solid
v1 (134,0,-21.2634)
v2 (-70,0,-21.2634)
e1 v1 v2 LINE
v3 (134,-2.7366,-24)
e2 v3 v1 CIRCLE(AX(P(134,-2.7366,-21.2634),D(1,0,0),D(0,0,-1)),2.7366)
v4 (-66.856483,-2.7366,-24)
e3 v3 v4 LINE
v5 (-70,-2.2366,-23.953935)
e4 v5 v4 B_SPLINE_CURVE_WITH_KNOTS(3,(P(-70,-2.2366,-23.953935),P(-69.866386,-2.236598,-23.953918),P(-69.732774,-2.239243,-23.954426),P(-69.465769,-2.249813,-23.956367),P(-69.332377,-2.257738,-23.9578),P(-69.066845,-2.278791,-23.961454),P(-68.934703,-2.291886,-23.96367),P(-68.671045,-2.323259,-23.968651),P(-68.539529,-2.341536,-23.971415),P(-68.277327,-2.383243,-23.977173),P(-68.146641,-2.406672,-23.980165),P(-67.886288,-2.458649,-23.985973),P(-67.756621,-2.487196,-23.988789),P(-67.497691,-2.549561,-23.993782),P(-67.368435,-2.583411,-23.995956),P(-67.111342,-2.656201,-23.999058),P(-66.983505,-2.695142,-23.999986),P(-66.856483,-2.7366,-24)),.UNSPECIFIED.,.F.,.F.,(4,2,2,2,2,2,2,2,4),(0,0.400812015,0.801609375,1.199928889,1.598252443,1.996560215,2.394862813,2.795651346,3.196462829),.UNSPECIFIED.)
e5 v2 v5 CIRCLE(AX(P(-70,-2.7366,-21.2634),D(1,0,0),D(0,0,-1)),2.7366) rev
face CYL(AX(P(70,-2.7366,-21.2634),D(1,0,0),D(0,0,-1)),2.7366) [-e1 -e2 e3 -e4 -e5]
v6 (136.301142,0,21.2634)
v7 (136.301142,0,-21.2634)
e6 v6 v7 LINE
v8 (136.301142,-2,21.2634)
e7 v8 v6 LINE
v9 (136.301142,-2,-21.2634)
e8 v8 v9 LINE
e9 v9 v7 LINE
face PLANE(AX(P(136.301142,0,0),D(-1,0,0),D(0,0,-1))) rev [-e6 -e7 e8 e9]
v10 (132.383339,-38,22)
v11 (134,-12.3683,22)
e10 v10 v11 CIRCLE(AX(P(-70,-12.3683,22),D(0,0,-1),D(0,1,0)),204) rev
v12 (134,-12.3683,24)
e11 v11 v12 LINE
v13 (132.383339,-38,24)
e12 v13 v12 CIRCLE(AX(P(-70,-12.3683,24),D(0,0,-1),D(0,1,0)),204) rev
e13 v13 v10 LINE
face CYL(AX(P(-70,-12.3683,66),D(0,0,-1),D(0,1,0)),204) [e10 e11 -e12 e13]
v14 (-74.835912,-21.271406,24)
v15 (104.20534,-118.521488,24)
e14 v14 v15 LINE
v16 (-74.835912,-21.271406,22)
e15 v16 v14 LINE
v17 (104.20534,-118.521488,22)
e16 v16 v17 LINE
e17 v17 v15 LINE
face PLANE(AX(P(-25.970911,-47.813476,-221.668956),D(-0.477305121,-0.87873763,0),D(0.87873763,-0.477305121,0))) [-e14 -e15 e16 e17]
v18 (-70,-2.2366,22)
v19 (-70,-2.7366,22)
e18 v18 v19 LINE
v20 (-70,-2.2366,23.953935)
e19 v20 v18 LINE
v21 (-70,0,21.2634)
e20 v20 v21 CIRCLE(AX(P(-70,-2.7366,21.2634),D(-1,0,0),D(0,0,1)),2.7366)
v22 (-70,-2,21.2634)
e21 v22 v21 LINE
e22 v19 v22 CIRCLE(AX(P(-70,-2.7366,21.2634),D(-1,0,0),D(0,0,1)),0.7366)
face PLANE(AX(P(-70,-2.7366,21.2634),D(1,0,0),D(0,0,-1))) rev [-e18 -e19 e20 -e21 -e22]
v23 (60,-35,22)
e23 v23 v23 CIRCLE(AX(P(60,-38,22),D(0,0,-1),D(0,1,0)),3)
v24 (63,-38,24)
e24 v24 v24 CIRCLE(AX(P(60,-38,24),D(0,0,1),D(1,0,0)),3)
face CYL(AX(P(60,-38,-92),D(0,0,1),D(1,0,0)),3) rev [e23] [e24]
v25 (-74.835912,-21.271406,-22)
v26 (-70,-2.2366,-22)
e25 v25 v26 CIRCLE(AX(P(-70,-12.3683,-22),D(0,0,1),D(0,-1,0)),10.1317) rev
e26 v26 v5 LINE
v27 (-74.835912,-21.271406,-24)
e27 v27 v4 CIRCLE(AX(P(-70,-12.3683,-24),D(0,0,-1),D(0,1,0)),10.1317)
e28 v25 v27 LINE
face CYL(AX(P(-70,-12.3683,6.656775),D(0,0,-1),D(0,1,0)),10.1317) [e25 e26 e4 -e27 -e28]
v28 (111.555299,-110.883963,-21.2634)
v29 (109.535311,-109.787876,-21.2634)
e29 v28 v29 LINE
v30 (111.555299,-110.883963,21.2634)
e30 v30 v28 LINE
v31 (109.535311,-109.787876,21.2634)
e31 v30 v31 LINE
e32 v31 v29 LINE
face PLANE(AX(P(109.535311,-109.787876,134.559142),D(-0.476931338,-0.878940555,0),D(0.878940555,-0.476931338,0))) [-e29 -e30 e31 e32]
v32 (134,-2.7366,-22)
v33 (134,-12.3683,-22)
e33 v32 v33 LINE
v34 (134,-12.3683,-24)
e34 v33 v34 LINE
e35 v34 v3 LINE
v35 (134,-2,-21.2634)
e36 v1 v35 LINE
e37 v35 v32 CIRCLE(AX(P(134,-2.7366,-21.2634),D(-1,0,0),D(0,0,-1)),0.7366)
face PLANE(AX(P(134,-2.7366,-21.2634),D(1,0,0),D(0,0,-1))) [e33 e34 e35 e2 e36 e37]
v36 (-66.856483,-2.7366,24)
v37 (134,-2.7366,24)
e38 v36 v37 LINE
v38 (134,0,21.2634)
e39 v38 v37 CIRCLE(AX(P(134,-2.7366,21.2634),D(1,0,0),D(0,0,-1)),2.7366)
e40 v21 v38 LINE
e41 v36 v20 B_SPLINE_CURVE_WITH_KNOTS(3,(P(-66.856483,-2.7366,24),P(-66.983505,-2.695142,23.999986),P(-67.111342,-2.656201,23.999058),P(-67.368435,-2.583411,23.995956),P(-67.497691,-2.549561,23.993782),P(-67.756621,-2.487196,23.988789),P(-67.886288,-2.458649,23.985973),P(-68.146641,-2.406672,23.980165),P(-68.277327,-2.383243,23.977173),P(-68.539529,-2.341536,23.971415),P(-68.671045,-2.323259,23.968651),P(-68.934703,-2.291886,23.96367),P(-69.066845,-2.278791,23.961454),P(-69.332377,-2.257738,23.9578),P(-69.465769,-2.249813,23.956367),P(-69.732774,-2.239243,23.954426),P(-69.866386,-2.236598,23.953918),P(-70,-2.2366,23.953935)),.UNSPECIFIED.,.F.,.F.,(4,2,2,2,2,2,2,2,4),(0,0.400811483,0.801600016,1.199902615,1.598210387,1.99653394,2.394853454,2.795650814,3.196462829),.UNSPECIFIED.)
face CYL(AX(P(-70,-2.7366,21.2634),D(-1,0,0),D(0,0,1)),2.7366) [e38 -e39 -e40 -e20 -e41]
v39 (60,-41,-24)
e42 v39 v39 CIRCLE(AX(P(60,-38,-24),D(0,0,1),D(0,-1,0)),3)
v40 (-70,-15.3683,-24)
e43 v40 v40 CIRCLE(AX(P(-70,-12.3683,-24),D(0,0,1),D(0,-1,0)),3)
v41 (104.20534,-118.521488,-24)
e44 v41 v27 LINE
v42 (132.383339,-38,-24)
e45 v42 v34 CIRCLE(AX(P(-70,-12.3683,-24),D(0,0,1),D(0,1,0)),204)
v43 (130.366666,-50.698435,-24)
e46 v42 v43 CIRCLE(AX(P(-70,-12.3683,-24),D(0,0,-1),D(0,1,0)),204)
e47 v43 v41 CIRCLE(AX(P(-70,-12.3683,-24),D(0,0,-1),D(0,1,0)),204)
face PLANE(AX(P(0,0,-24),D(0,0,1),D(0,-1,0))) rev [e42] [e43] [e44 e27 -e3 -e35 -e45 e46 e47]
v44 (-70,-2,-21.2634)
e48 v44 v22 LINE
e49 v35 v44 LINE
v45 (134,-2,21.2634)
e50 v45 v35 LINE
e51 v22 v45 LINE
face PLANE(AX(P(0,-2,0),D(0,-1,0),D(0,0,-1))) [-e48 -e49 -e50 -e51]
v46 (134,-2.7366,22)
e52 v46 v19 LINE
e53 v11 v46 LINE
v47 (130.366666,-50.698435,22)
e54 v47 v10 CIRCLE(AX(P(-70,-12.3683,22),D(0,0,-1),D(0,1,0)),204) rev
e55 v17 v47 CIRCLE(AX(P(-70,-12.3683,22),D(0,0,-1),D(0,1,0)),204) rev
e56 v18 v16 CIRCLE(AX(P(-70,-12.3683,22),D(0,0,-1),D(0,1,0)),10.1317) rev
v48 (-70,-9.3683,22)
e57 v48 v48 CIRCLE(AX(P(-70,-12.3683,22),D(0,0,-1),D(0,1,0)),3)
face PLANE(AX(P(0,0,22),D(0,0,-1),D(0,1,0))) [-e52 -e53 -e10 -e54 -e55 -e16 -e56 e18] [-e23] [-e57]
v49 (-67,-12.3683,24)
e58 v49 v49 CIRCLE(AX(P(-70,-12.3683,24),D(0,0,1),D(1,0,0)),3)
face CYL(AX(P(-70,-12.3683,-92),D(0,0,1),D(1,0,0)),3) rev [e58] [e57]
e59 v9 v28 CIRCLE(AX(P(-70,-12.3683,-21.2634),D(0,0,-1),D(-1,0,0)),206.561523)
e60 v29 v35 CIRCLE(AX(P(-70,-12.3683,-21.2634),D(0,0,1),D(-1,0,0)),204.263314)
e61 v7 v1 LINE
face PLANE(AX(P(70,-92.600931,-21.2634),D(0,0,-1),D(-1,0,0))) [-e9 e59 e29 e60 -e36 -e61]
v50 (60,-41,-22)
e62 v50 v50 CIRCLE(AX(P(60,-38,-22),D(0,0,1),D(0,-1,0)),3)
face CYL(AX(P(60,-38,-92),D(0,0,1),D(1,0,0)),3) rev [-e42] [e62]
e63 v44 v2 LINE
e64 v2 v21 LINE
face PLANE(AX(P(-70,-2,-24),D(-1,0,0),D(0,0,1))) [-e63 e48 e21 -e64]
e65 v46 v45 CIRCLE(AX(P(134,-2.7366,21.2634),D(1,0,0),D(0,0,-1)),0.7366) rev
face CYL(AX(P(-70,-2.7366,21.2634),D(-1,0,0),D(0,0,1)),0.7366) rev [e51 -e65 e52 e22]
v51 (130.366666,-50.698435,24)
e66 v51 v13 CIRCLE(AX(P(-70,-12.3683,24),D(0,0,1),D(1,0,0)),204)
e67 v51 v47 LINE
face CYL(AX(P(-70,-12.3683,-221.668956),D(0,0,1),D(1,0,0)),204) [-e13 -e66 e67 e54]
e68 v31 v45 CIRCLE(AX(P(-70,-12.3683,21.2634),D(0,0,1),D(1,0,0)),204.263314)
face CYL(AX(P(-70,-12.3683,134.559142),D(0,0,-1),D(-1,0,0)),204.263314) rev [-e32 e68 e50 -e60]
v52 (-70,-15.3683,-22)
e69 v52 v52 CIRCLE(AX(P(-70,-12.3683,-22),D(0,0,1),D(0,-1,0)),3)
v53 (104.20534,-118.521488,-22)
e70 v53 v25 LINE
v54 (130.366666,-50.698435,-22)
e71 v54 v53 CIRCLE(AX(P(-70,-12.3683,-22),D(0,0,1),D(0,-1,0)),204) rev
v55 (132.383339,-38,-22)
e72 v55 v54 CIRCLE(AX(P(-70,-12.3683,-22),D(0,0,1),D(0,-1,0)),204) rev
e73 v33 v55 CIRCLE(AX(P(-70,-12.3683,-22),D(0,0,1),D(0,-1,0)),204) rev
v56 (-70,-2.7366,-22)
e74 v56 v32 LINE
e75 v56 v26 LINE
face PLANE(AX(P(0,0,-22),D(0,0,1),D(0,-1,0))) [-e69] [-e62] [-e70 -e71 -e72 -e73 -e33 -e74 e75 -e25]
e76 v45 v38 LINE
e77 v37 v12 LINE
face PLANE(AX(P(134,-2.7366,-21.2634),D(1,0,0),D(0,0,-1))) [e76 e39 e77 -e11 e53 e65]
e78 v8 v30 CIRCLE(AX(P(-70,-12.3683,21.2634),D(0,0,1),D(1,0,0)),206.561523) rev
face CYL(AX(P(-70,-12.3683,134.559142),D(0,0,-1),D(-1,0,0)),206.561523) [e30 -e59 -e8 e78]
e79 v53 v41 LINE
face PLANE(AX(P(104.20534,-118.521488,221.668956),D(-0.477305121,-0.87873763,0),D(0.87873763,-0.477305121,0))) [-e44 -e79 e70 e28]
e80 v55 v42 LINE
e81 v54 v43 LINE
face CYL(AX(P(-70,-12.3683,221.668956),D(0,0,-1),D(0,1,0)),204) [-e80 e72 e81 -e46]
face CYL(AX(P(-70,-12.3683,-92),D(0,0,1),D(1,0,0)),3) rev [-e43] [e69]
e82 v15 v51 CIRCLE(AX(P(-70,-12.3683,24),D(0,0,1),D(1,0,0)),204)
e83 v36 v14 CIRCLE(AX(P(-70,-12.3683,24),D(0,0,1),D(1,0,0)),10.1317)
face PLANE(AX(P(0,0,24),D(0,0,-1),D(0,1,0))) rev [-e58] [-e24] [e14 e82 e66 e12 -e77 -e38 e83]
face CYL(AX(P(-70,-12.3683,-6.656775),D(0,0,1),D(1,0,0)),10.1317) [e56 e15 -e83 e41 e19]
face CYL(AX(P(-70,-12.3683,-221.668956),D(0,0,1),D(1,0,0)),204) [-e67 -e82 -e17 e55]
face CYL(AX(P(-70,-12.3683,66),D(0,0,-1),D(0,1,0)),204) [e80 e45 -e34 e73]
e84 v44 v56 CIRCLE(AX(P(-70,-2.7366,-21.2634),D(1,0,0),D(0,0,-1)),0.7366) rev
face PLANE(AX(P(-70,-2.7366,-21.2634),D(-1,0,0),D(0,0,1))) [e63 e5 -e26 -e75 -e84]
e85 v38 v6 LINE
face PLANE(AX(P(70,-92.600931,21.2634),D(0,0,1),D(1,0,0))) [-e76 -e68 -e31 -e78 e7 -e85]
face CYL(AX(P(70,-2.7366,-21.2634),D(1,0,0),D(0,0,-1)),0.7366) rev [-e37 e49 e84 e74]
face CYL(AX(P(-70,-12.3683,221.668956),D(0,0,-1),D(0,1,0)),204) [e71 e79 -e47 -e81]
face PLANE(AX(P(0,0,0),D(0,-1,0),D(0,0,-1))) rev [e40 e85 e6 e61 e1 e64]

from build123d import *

# Parameters (mm, degrees)
BASE_FLANGE1_DEPTH           = 2
EDGE_FLANGE1_STRIP_CUT_DEPTH = 140
EDGE_FLANGE1_DEPTH           = 140
EDGE_FLANGE2_STRIP_CUT_DEPTH = 140
EDGE_FLANGE2_DEPTH           = 140
BOSS_EXTRUDE1_DEPTH          = 2
BOSS_EXTRUDE2_START          = -2
BOSS_EXTRUDE2_DEPTH          = 2
SKETCH14_R                   = 10.1317
BOSS_EXTRUDE3_DEPTH          = 2
BOSS_EXTRUDE4_START          = -2
SKETCH15_R                   = 10.131700000000007
BOSS_EXTRUDE4_DEPTH          = 2
FILLET1_R                    = 20
SKETCH16_R                   = 3.0000000000000084
SKETCH16_R_2                 = 3.000000000000008
CUT_EXTRUDE1_DEPTH           = 116.00000000000001
BOSS_EXTRUDE5_DEPTH          = 2
BOSS_EXTRUDE6_DEPTH          = 64
BOSS_EXTRUDE8_START          = 64
BOSS_EXTRUDE8_DEPTH          = 64
SKETCH38_R                   = 3.000000000000008
SKETCH38_R_2                 = 2.9999999999999947
BOSS_EXTRUDE9_DEPTH          = 2
BOSS_EXTRUDE10_START         = -2
SKETCH40_R                   = 3.0000000000000084
BOSS_EXTRUDE10_DEPTH         = 2
CUT_EXTRUDE2_START           = -90
CUT_EXTRUDE2_DEPTH           = 90
SKETCH42_W                   = 17.233890077557817
SKETCH42_H                   = 15.447994732733191
CUT_EXTRUDE3_DEPTH           = 90
BOSS_EXTRUDE11_DEPTH         = 42.5268


# Sheet-metal steps are written as plain solids
with BuildPart() as part:
    # Sketch1 → Base-Flange1 (new body)
    with BuildSketch(Plane(origin=(0, 0, 0), x_dir=(1, 0, 0), z_dir=(0, 1, 0))):
        Polygon((69.99999999999999, 24.000000000000007), (-70.00000000000003, 23.99999999999999), (-70.00000000000003, -24.000000000000018), (69.99999999999999, -24), align=None)
    extrude(amount=-BASE_FLANGE1_DEPTH)

    # Edge-Flange1 strip (across the edge) → Edge-Flange1 strip cut (cut)
    with BuildSketch(Plane(origin=(69.99999999999999, -2, 24), x_dir=(-1.2e-16, -3.49e-15, -1), z_dir=(-1, 0, 1.2e-16))):
        Polygon((-6.736600000000024, -2.0000000000000235), (2.73660000000001, -1.9999999999999907), (2.736600000000003, 9.55e-15), (-6.736600000000031, -2.353e-14), align=None)
    extrude(amount=EDGE_FLANGE1_STRIP_CUT_DEPTH, mode=Mode.SUBTRACT)

    # Edge-Flange1 section (across the edge) → Edge-Flange1 (add)
    with BuildSketch(Plane(origin=(69.99999999999999, -2, 24), x_dir=(-1.2e-16, -3.49e-15, -1), z_dir=(-1, 0, 1.2e-16))):
        with BuildLine():
            Line((0, 0.7366000000000096), (0, 20.000000000000004))
            Line((0, 20.000000000000004), (2, 20.000000000000004))
            Line((2, 20.000000000000004), (2, 0.7366000000000096))
            ThreePointArc((2, 0.7366000000000096), (2.21574514497799, 0.21574514497799768), (2.736600000000003, 9.55e-15))
            Line((2.736600000000003, 9.55e-15), (2.73660000000001, -1.9999999999999907))
            ThreePointArc((2.73660000000001, -1.9999999999999907), (0.8015315826048977, -1.1984684173951), (0, 0.7366000000000096))
        make_face()
    extrude(amount=EDGE_FLANGE1_DEPTH)

    # Edge-Flange2 strip (across the edge) → Edge-Flange2 strip cut (cut)
    with BuildSketch(Plane(origin=(-70.00000000000003, -2, -23.999999999999993), x_dir=(1.2e-16, -3.49e-15, 1), z_dir=(1, 0, -1.2e-16))):
        Polygon((-6.736600000000024, -2.0000000000000235), (2.73660000000001, -1.9999999999999907), (2.736600000000003, 9.55e-15), (-6.736600000000031, -2.353e-14), align=None)
    extrude(amount=EDGE_FLANGE2_STRIP_CUT_DEPTH, mode=Mode.SUBTRACT)

    # Edge-Flange2 section (across the edge) → Edge-Flange2 (add)
    with BuildSketch(Plane(origin=(-70.00000000000003, -2, -23.999999999999993), x_dir=(1.2e-16, -3.49e-15, 1), z_dir=(1, 0, -1.2e-16))):
        with BuildLine():
            Line((0, 0.7366000000000096), (0, 20.000000000000004))
            Line((0, 20.000000000000004), (2, 20.000000000000004))
            Line((2, 20.000000000000004), (2, 0.7366000000000096))
            ThreePointArc((2, 0.7366000000000096), (2.21574514497799, 0.21574514497799768), (2.736600000000003, 9.55e-15))
            Line((2.736600000000003, 9.55e-15), (2.73660000000001, -1.9999999999999907))
            ThreePointArc((2.73660000000001, -1.9999999999999907), (0.8015315826048977, -1.1984684173951), (0, 0.7366000000000096))
        make_face()
    extrude(amount=EDGE_FLANGE2_DEPTH)

    # Sketch12 → Boss-Extrude1 (add)
    with BuildSketch(Plane.XY.offset(24)):
        with BuildLine():
            Line((69.99999999999997, -38.00000000000009), (69.99999999999997, -5.0936152776594525))
            Line((69.99999999999997, -5.0936152776594525), (49.99999999999997, -5.093615277659455))
            Line((49.99999999999997, -5.093615277659455), (49.99999999999997, -38.00000000000009))
            ThreePointArc((49.99999999999997, -38.00000000000009), (59.99999999999997, -48.000000000000085), (69.99999999999997, -38.00000000000009))
        make_face()
    extrude(amount=-BOSS_EXTRUDE1_DEPTH)

    # Sketch13 → Boss-Extrude2 (add)
    with BuildSketch(Plane(origin=(-2.97e-15, 8.743e-14, -23.999999999999986), x_dir=(-1, 0, 1.2e-16), z_dir=(-1.2e-16, 3.63e-15, -1)).offset(BOSS_EXTRUDE2_START)):
        with BuildLine():
            Line((-49.99999999999997, -21.999999999999922), (-49.99999999999997, -2.736599999999933))
            Line((-49.99999999999997, -2.736599999999933), (-69.99999999999999, -2.7365999999999113))
            Line((-69.99999999999999, -2.7365999999999113), (-69.99999999999997, -37.99999999999992))
            ThreePointArc((-69.99999999999997, -37.99999999999992), (-59.99999999999997, -47.999999999999915), (-49.99999999999997, -37.999999999999915))
            Line((-49.99999999999997, -37.999999999999915), (-49.99999999999997, -21.999999999999922))
        make_face()
    extrude(amount=BOSS_EXTRUDE2_DEPTH)

    # Sketch14 → Boss-Extrude3 (add)
    with BuildSketch(Plane.XY.offset(24)):
        with Locations((-70.00000000000003, -12.368300000000078)):
            Circle(SKETCH14_R)
    extrude(amount=-BOSS_EXTRUDE3_DEPTH)

    # Sketch15 → Boss-Extrude4 (add)
    with BuildSketch(Plane(origin=(-2.97e-15, 8.743e-14, -23.999999999999986), x_dir=(-1, 0, 1.2e-16), z_dir=(-1.2e-16, 3.63e-15, -1)).offset(BOSS_EXTRUDE4_START)):
        with Locations((70.00000000000003, -12.368300000000081)):
            Circle(SKETCH15_R)
    extrude(amount=BOSS_EXTRUDE4_DEPTH)

    # Fillet1
    fillet1_edges = [part.edges().sort_by_distance(p)[0] for p in [
        (49.99999999999997, -22.000000000000007, -23.000000000000075),
        (49.99999999999997, -22.000000000000007, 23.000000000000036),
    ]]
    fillet(fillet1_edges, radius=FILLET1_R)

    # Sketch16 → Cut-Extrude1 (cut)
    with BuildSketch(Plane.XY.offset(24)):
        with Locations(Location((59.99999999999997, -38.000000000000085, 0), (0, 0, 270))):
            Circle(SKETCH16_R)
        with Locations(Location((-70.00000000000003, -12.368300000000078, 0), (0, 0, 270))):
            Circle(SKETCH16_R_2)
    extrude(amount=-CUT_EXTRUDE1_DEPTH, mode=Mode.SUBTRACT)

    # Sketch23 → Boss-Extrude5 (add)
    with BuildSketch(Plane(origin=(0, 0, 0), x_dir=(1, 0, 0), z_dir=(0, 1, 0))):
        Polygon((69.99999999999999, 21.263400000000036), (149.99999999999997, 21.263400000000036), (149.99999999999997, -17.83002853781927), (149.99999999999997, -21.2634), (69.99999999999999, -21.2634), align=None)
    extrude(amount=-BOSS_EXTRUDE5_DEPTH)

    # Sketch31 → Boss-Extrude6 (add)
    with BuildSketch(Plane(origin=(69.99999999999999, 0, 0), x_dir=(0, 0, -1), z_dir=(1, 0, 0))):
        with BuildLine():
            Line((21.999999999999993, -2.736599999999998), (22.00000000000014, -37.99999999999992))
            Line((22.00000000000014, -37.99999999999992), (24.00000000000013, -37.99999999999983))
            Line((24.00000000000013, -37.99999999999983), (24, -2.736599999999978))
            ThreePointArc((24, -2.736599999999978), (23.198468417395112, -0.8015315826048983), (21.263400000000036, 0))
            Line((21.263400000000036, 0), (21.263400000000008, -2.000000000000007))
            ThreePointArc((21.263400000000008, -2.000000000000007), (21.78425485502201, -2.2157451449779955), (21.999999999999993, -2.736599999999998))
        make_face()
    extrude(amount=BOSS_EXTRUDE6_DEPTH)

    # Sketch37 → Boss-Extrude8 (add)
    with BuildSketch(Plane(origin=(69.99999999999999, 0, -8.67e-15), x_dir=(-1.2e-16, 0, -1), z_dir=(1, 0, -1.2e-16)).offset(BOSS_EXTRUDE8_START)):
        with BuildLine():
            Line((-24.000000000000007, -2.736599999999984), (-24.000000000000007, -38.00000000000001))
            Line((-24.000000000000007, -38.00000000000001), (-22.00000000000013, -38.00000000000001))
            Line((-22.00000000000013, -38.00000000000001), (-22.000000000000007, -2.736599999999991))
            ThreePointArc((-22.000000000000007, -2.736599999999991), (-21.784254855022017, -2.215745144977985), (-21.263400000000008, -2.0000000000000018))
            Line((-21.263400000000008, -2.0000000000000018), (-21.263400000000008, 0))
            ThreePointArc((-21.263400000000008, 0), (-23.198468417395112, -0.8015315826048868), (-24.000000000000007, -2.736599999999984))
        make_face()
    extrude(amount=-BOSS_EXTRUDE8_DEPTH)

    # Sketch38 → Boss-Extrude9 (add)
    with BuildSketch(Plane.XY.offset(24)):
        with BuildLine():
            ThreePointArc((-70.00000000000003, -2.2366000000000525), (-79.81974909015226, -9.873530933241609), (-74.83591228983121, -21.271406043121214))
            Line((-74.83591228983121, -21.271406043121214), (104.20534041751986, -118.52148822351042))
            ThreePointArc((104.20534041751986, -118.52148822351043), (127.65743204047538, -62.8414568179052), (133.77238644648855, -2.7342706299537234))
            Line((133.77238644648853, -2.734270629953711), (-69.95051125882394, -2.236720865704318))
            Line((-69.95051125882394, -2.236720865704318), (-70.00000000000003, -2.2366000000000574))
        make_face()
        with Locations((-70.00000000000003, -12.368300000000078)):
            Circle(SKETCH38_R, mode=Mode.SUBTRACT)
        with Locations((59.99999999999997, -38.000000000000085)):
            Circle(SKETCH38_R_2, mode=Mode.SUBTRACT)
    extrude(amount=-BOSS_EXTRUDE9_DEPTH)

    # Sketch40 → Boss-Extrude10 (add)
    with BuildSketch(Plane(origin=(-2.97e-15, 8.743e-14, -23.999999999999986), x_dir=(-1, 0, 1.2e-16), z_dir=(-1.2e-16, 3.64e-15, -1)).offset(BOSS_EXTRUDE10_START)):
        with BuildLine():
            Line((-133.99999999999997, -37.99999999999992), (-132.38333912432114, -37.99999999999992))
            ThreePointArc((-132.38333912432114, -37.99999999999992), (-122.55047625544603, -79.7501528522397), (-104.20534041751992, -118.52148822351012))
            Line((-104.20534041751992, -118.52148822351012), (74.83591228983121, -21.27140604312103))
            ThreePointArc((74.83591228983121, -21.27140604312103), (79.81974909015223, -9.873530933241451), (70.00000000000003, -2.236599999999915))
            Line((70.00000000000003, -2.236599999999915), (70.00000000000003, -2.7365999999999118))
            Line((70.00000000000003, -2.7365999999999118), (-133.99999999999997, -2.7365999999999118))
            Line((-133.99999999999997, -2.7365999999999118), (-133.99999999999997, -37.99999999999992))
        make_face()
        with Locations(Location((-59.99999999999997, -37.999999999999915, 0), (0, 0, 270))):
            Circle(SKETCH40_R, mode=Mode.SUBTRACT)
        with Locations(Location((70.00000000000003, -12.368300000000081, 0), (0, 0, 270))):
            Circle(SKETCH40_R, mode=Mode.SUBTRACT)
    extrude(amount=BOSS_EXTRUDE10_DEPTH)

    # Sketch41 → Cut-Extrude2 (cut)
    with BuildSketch(Plane(origin=(-2.97e-15, 8.743e-14, -23.999999999999986), x_dir=(-1, 0, 1.2e-16), z_dir=(-1.2e-16, 3.64e-15, -1)).offset(CUT_EXTRUDE2_START)):
        with BuildLine():
            Line((-133.99999999999991, -12.368300000000081), (-149.94232536885565, -45.23983757324427))
            Line((-149.94232536885565, -45.23983757324427), (-130.36666577541695, -50.69843495987621))
            ThreePointArc((-130.36666577541695, -50.69843495987621), (-133.08963515918902, -31.619276362446172), (-133.99999999999991, -12.368300000000081))
        make_face()
    extrude(amount=CUT_EXTRUDE2_DEPTH, mode=Mode.SUBTRACT)

    # Sketch42 → Cut-Extrude3 (cut)
    with BuildSketch(Plane(origin=(0, 0, -21.263400000000036), x_dir=(-1, 0, 0), z_dir=(0, 0, -1))):
        with Locations((-144.91808666667805, -5.115479942404007)):
            Rectangle(SKETCH42_W, SKETCH42_H)
    extrude(amount=-CUT_EXTRUDE3_DEPTH, mode=Mode.SUBTRACT)

    # Sketch43 → Boss-Extrude11 (add)
    with BuildSketch(Plane(origin=(0, 0, -21.263400000000036), x_dir=(-1, 0, 0), z_dir=(0, 0, -1))):
        with BuildLine():
            Line((-109.53531100208852, -109.78787579600389), (-111.55529945125834, -110.88396333851894))
            ThreePointArc((-111.55529945125834, -110.88396333851894), (-131.48462736674514, -57.8832164203161), (-136.27341292027893, -1.4622556169704357))
            Line((-136.27341292027893, -1.4622556169704357), (-133.93880439229082, -0.8589252153757276))
            ThreePointArc((-133.93880439229082, -0.8589252153757276), (-129.32254855641568, -57.02278781326821), (-109.53531100208852, -109.78787579600389))
        make_face()
    extrude(amount=-BOSS_EXTRUDE11_DEPTH)


solid = part.part
